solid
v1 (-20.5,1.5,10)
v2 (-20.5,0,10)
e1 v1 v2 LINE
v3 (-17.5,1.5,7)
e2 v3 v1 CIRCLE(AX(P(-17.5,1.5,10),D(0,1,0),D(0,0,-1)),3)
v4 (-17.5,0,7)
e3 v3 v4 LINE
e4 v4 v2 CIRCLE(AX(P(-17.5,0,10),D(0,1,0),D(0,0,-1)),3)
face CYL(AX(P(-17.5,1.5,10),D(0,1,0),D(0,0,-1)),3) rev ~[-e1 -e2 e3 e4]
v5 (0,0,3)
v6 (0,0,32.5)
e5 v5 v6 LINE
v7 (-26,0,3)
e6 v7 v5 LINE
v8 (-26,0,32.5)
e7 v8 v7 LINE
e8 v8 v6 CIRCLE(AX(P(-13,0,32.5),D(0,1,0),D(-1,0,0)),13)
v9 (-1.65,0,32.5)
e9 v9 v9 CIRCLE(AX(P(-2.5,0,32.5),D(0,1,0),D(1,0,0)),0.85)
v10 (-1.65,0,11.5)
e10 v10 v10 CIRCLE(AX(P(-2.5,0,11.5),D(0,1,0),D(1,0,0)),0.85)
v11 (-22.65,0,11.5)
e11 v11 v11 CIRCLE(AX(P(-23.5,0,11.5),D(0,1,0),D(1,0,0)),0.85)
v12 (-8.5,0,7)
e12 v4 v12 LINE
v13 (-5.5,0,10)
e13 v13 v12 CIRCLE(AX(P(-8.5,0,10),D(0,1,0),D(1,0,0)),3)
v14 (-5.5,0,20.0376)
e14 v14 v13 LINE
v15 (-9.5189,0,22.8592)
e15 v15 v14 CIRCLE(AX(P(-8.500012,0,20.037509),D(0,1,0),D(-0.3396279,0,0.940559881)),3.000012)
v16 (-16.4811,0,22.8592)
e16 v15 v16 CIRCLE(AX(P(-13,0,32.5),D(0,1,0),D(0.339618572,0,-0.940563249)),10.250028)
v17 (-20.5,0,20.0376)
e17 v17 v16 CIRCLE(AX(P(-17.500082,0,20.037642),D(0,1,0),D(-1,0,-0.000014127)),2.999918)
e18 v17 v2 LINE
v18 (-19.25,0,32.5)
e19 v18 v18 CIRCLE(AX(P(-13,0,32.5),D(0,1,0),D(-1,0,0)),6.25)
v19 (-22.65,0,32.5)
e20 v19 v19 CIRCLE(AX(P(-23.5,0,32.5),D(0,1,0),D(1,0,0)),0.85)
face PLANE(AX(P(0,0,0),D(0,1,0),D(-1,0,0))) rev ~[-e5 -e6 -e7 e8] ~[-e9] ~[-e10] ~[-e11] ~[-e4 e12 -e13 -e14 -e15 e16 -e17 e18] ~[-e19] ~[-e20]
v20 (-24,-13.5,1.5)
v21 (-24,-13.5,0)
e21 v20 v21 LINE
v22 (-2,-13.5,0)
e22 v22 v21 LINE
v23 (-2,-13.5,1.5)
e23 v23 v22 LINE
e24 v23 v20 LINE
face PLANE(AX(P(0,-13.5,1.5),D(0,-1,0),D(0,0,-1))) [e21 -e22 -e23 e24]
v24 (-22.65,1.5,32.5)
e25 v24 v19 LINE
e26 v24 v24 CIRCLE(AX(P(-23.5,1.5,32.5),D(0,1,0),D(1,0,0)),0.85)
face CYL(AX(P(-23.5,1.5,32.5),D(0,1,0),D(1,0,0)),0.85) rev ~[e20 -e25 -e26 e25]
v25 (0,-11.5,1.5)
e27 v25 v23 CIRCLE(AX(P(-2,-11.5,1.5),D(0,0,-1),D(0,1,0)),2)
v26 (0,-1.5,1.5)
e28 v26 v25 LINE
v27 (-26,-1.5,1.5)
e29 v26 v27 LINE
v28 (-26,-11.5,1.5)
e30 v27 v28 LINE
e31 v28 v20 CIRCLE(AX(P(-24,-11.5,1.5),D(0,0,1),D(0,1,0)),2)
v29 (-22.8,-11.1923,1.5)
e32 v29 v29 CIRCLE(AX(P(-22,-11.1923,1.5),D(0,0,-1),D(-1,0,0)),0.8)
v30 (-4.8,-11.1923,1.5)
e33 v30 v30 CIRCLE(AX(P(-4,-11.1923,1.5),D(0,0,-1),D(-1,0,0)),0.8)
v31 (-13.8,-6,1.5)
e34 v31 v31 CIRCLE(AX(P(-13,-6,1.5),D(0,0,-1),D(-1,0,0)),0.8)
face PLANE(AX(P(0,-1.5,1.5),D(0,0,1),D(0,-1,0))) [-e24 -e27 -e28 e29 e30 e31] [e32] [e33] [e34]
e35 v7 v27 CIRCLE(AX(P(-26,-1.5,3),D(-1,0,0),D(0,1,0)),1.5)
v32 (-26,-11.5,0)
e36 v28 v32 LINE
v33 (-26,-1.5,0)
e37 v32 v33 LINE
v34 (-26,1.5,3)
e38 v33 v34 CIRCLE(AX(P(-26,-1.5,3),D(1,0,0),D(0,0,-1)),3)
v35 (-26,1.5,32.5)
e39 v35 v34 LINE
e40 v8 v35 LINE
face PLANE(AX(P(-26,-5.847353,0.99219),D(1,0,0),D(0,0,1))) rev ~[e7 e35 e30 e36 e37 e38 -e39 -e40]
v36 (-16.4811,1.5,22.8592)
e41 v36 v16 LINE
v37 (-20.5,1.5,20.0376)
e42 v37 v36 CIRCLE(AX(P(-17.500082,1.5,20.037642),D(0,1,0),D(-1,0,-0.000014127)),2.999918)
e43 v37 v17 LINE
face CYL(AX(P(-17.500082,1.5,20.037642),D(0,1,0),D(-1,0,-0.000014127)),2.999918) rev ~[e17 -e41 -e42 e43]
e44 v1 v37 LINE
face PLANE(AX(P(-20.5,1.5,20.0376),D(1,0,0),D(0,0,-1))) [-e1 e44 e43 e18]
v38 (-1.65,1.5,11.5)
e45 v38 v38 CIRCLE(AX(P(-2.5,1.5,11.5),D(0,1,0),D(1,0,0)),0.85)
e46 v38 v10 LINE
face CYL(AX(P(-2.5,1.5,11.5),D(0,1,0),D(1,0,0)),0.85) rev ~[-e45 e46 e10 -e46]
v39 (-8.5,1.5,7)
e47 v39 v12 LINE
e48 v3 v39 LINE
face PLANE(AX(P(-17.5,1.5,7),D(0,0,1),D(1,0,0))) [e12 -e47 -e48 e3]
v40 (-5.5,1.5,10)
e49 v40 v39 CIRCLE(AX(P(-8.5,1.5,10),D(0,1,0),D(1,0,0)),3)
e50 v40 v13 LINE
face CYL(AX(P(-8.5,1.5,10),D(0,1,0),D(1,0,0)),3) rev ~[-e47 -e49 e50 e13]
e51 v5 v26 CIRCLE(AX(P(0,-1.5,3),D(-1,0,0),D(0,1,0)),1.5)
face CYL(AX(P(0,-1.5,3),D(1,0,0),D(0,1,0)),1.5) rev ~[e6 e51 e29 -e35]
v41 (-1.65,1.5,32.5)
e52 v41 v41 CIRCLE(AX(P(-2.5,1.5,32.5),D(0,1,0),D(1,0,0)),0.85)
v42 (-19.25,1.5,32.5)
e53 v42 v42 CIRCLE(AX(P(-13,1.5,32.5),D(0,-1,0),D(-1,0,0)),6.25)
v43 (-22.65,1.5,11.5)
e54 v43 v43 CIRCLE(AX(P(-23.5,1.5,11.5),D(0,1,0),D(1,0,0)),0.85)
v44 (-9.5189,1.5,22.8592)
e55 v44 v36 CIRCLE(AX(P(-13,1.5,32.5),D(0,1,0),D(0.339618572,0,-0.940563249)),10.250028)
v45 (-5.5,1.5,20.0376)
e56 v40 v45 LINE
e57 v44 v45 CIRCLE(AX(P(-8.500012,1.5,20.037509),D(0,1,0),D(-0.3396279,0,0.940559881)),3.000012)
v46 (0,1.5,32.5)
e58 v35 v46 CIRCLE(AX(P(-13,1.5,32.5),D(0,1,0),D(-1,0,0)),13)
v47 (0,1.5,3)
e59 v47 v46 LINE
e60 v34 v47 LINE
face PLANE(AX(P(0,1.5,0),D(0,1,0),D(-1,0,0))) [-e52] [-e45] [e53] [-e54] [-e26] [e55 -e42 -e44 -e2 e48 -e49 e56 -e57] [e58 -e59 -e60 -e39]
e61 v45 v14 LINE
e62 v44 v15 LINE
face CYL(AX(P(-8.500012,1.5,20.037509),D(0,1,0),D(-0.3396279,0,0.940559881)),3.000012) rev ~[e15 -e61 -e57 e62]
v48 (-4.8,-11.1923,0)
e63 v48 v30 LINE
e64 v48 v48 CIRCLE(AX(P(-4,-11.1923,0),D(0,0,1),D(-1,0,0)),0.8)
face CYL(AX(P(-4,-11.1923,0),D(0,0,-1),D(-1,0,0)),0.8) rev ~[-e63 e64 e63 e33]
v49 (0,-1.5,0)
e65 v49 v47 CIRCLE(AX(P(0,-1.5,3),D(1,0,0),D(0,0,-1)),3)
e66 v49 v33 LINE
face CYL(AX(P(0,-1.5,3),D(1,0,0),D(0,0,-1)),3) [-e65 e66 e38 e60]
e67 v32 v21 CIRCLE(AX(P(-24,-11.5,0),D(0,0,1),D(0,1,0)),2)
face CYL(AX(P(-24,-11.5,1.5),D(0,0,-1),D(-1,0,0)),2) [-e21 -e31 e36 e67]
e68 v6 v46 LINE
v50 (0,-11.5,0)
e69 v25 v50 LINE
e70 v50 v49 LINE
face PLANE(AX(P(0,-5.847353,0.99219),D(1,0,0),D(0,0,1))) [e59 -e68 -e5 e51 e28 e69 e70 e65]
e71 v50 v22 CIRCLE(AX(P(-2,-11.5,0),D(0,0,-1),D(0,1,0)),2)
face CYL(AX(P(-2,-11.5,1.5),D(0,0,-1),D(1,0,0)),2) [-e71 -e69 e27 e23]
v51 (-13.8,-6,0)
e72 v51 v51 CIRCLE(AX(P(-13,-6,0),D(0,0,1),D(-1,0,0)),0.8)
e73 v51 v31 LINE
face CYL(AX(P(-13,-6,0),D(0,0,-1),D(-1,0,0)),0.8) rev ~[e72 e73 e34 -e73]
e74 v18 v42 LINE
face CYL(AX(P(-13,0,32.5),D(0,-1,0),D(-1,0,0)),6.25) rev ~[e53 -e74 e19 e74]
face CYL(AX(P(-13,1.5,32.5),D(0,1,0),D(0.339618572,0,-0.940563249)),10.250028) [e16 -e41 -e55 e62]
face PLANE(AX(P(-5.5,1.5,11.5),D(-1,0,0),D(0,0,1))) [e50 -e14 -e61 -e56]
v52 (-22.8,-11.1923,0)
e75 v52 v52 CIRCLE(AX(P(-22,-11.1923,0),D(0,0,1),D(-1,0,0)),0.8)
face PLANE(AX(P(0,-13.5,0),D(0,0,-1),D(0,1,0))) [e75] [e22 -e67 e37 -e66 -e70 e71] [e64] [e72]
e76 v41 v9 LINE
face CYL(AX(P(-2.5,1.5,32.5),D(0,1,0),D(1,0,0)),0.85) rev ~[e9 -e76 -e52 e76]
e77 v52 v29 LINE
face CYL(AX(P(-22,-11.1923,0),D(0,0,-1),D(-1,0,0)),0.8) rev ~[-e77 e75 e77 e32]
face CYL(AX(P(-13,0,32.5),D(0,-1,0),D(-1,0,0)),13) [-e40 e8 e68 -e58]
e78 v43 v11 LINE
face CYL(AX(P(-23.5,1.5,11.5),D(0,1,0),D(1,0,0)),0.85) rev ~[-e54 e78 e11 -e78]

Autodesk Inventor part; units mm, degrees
ref_plane "YZ Plane" through (0, 0, 0) normal (1, 0, 0) x (0, 1, 0)
ref_plane "XZ Plane" through (0, 0, 0) normal (0, 1, 0) x (-1, 0, 0)
ref_plane "XY Plane" through (0, 0, 0) normal (0, 0, 1) x (1, 0, 0)
sketch "スケッチ1" plane through (0, 0, 0) normal (0, 1, 0) x (-1, 0, 0)
  line L0 (26, 0) -> (0, 0)
  line L1 (0, 0) -> (0, -89.5474)
  line L2 (0, -89.5474) -> (26, -89.5474)
  line L3 (26, -89.5474) -> (26, 0)
  line L4 (26, 0) -> (0, 0)
  line L5 (0, 0) -> (0, 70)
  line L6 (0, 70) -> (26, 70)
  line L7 (26, 70) -> (26, 0)
  line L8 (26, 32.5) -> (0, 32.5)
  circle A0 centre (13, 32.5) radius 6.25
  circle A1 centre (13, 32.5) radius 13
  point P0 (26, 32.5)
  point P1 (0, 32.5)
  dimension "d2" = 70
  dimension "d3" = 26
  dimension "d4" = 32.5
  dimension "d5" = 12.5
extrude "プレート1" add sketch "スケッチ1" along normal blind 1.5 contours L0 L5 A1 L7 | A1 L8 A0 | L8 A0 A1
sketch "スケッチ3" plane through (0, 1.5, 0) normal (0, 1, 0) x (1, 0, 0)
  circle A0 centre (-23.5, -32.5) radius 0.85 projected
  circle A1 centre (-23.5, -11.5) radius 0.85 projected
  circle A2 centre (-2.5, -11.5) radius 0.85 projected
  circle A3 centre (-2.5, -32.5) radius 0.85 projected
  point P0 (0, 0)
extrude "切り取り1" cut sketch "スケッチ3" against normal blind 1.5
sketch "スケッチ4" plane through (0, 1.5, 1.5) normal (0, 0, -1) x (-1, 0, 0)
  line L0 (26, 0) -> (0, 0)
  line L1 (0, 0) -> (0, -15)
  line L2 (0, -15) -> (26, -15)
  line L3 (26, -15) -> (26, 0)
edge flange "フランジ2" height 15 angle 90 thickness 1.5 bend radius 1.5 thickness toward (0, 0, -1) relief tear relief width 1.5 relief depth 0.75 edges at (-13, 0, 0) wall of the first edge with corners at (-26, 1.5, 1.5) (0, 1.5, 1.5) (0, -13.5, 1.5) (-26, -13.5, 1.5)
bend "曲げ2"
corner "コーナー2"
sketch "スケッチ5" plane through (0, -13.5, 0) normal (0, 0, -1) x (-1, 0, 0)
  line L0 (0, 0) -> (26, 0)
  line L1 (26, 0) -> (26, 15)
  line L2 (26, 15) -> (0, 15)
  line L3 (0, 15) -> (0, 0)
  line L4 (26, 12) -> (26, 0) projected
  line L5 (0, 0) -> (0, 12) projected
  line L6 (0, 15) -> (26, 0)
  line L7 (26, 15) -> (0, 0)
  line L8 (4, 12.6923) -> (22, 12.6923)
  line L9 (22, 12.6923) -> (22, 2.3077)
  line L10 (22, 2.3077) -> (4, 2.3077)
  line L11 (4, 2.3077) -> (4, 12.6923)
  circle A0 centre (4, 12.6923) radius 0.8
  circle A1 centre (22, 12.6923) radius 0.8
  circle A2 centre (4, 2.3077) radius 0.8
  circle A3 centre (22, 2.3077) radius 0.8
  circle A4 centre (13, 7.5) radius 0.8
  point P0 (0, 13.5)
  dimension "d35" = 15
  dimension "d36" = 4
  dimension "d37" = 1.6
  dimension "d38" = 1.6
  dimension "d39" = 1.6
  dimension "d40" = 1.6
  dimension "d43" = 1.6
extrude "切り取り3" cut sketch "スケッチ5" against normal blind 1.5 contours A2 L11 L7 | L7 L10 A2 | A3 L10 L6 | L6 L9 A3 | L11 A2 L7 | L7 A2 L10 | L10 A3 L6 | L6 A3 L9 | A4 L6 L7 | L7 L6 A4 | L6 L7 A4 | L6 A4 L7
sketch "スケッチ6" plane through (0, 1.5, 0) normal (0, 1, 0) x (1, 0, 0)
  circle A0 centre (-2.5, -32.5) radius 0.85 projected
  circle A1 centre (-23.5, -32.5) radius 0.85 projected
  circle A2 centre (-23.5, -11.5) radius 0.85 projected
  circle A3 centre (-2.5, -11.5) radius 0.85 projected
  line L0 (-2.5, -32.5) -> (-23.5, -32.5)
  line L1 (-23.5, -32.5) -> (-23.5, -11.5)
  line L2 (-23.5, -11.5) -> (-2.5, -11.5)
  line L3 (-2.5, -11.5) -> (-2.5, -32.5)
  line L4 (-5.5, -32.5) -> (-20.5, -32.5)
  line L5 (-20.5, -20.0376) -> (-20.5, -10)
  line L6 (-17.5, -7) -> (-8.5, -7)
  line L7 (-5.5, -10) -> (-5.5, -20.0376)
  circle A4 centre (-13, -32.5) radius 6.25 projected
  line L8 (0, -3) -> (-26, -3) projected
  arc A5 (-9.5189, -22.8592) -> (-16.4811, -22.8592) centre (-13, -32.5) ccw
  arc A6 (-23.2186, -31.6979) -> (-23.2186, -33.3021) centre (-13, -32.5) ccw
  arc A7 (-2.7814, -33.3021) -> (-2.7814, -31.6979) centre (-13, -32.5) ccw
  arc A8 (-9.5189, -22.8592) -> (-5.5, -20.0376) centre (-8.5, -20.0376) ccw
  arc A9 (-20.5, -20.0376) -> (-16.4811, -22.8592) centre (-17.5, -20.0376) ccw
  arc A10 (-5.5, -10) -> (-8.5, -7) centre (-8.5, -10) ccw
  arc A11 (-17.5, -7) -> (-20.5, -10) centre (-17.5, -10) ccw
  point P0 (0, 0)
  point P1 (-20.5, -7)
  point P2 (-5.5, -7)
  point P3 (-5.5, -25.5134)
  point P4 (-20.5, -25.5134)
  dimension "d46" = 3
  dimension "d47" = 3
  dimension "d49" = 4
  dimension "d50" = 4
  dimension "d53" = 3
  dimension "d54" = 3
extrude "切り取り4" cut sketch "スケッチ6" against normal blind 1.5 contours L7 A8 A5 A9 L5 L2 | L2 L5 A11 L6 A10 L7
fillet "フィレット1" radius 2 2 edges at (-26, -13.5, 0.75) (0, -13.5, 0.75)
equation "\"d23\" = Thickness"
equation "\"d44\" = Thickness"
equation "\"d51\" = Thickness"
equation "\"d12\" = Thickness"
equation "\"d25\" = BendReliefWidth"
equation "\"d26\" = BendReliefDepth"
equation "\"d27\" = MinimumRemnant"
equation "\"d28\" = TransitionRadius"
equation "\"d31\" = BendRadius"
equation "\"d32\" = CornerReliefSize"
equation "\"d33\" = GapSize"
equation "\"d34\" = JacobiRadiusSize"
equation "\"BendRadius\" = Thickness"
equation "\"BendReliefWidth\" = Thickness"
equation "\"BendReliefDepth\" = 0.5 * Thickness"
equation "\"CornerReliefSize\" = 4 * Thickness"
equation "\"MinimumRemnant\" = 2 * Thickness"
equation "\"TransitionRadius\" = BendRadius"
equation "\"JacobiRadiusSize\" = BendRadius"
equation "\"GapSize\" = Thickness"
equation "\"Thickness\" = 1.5"
properties part number "toe_front" material "アルミニウム 6061"
